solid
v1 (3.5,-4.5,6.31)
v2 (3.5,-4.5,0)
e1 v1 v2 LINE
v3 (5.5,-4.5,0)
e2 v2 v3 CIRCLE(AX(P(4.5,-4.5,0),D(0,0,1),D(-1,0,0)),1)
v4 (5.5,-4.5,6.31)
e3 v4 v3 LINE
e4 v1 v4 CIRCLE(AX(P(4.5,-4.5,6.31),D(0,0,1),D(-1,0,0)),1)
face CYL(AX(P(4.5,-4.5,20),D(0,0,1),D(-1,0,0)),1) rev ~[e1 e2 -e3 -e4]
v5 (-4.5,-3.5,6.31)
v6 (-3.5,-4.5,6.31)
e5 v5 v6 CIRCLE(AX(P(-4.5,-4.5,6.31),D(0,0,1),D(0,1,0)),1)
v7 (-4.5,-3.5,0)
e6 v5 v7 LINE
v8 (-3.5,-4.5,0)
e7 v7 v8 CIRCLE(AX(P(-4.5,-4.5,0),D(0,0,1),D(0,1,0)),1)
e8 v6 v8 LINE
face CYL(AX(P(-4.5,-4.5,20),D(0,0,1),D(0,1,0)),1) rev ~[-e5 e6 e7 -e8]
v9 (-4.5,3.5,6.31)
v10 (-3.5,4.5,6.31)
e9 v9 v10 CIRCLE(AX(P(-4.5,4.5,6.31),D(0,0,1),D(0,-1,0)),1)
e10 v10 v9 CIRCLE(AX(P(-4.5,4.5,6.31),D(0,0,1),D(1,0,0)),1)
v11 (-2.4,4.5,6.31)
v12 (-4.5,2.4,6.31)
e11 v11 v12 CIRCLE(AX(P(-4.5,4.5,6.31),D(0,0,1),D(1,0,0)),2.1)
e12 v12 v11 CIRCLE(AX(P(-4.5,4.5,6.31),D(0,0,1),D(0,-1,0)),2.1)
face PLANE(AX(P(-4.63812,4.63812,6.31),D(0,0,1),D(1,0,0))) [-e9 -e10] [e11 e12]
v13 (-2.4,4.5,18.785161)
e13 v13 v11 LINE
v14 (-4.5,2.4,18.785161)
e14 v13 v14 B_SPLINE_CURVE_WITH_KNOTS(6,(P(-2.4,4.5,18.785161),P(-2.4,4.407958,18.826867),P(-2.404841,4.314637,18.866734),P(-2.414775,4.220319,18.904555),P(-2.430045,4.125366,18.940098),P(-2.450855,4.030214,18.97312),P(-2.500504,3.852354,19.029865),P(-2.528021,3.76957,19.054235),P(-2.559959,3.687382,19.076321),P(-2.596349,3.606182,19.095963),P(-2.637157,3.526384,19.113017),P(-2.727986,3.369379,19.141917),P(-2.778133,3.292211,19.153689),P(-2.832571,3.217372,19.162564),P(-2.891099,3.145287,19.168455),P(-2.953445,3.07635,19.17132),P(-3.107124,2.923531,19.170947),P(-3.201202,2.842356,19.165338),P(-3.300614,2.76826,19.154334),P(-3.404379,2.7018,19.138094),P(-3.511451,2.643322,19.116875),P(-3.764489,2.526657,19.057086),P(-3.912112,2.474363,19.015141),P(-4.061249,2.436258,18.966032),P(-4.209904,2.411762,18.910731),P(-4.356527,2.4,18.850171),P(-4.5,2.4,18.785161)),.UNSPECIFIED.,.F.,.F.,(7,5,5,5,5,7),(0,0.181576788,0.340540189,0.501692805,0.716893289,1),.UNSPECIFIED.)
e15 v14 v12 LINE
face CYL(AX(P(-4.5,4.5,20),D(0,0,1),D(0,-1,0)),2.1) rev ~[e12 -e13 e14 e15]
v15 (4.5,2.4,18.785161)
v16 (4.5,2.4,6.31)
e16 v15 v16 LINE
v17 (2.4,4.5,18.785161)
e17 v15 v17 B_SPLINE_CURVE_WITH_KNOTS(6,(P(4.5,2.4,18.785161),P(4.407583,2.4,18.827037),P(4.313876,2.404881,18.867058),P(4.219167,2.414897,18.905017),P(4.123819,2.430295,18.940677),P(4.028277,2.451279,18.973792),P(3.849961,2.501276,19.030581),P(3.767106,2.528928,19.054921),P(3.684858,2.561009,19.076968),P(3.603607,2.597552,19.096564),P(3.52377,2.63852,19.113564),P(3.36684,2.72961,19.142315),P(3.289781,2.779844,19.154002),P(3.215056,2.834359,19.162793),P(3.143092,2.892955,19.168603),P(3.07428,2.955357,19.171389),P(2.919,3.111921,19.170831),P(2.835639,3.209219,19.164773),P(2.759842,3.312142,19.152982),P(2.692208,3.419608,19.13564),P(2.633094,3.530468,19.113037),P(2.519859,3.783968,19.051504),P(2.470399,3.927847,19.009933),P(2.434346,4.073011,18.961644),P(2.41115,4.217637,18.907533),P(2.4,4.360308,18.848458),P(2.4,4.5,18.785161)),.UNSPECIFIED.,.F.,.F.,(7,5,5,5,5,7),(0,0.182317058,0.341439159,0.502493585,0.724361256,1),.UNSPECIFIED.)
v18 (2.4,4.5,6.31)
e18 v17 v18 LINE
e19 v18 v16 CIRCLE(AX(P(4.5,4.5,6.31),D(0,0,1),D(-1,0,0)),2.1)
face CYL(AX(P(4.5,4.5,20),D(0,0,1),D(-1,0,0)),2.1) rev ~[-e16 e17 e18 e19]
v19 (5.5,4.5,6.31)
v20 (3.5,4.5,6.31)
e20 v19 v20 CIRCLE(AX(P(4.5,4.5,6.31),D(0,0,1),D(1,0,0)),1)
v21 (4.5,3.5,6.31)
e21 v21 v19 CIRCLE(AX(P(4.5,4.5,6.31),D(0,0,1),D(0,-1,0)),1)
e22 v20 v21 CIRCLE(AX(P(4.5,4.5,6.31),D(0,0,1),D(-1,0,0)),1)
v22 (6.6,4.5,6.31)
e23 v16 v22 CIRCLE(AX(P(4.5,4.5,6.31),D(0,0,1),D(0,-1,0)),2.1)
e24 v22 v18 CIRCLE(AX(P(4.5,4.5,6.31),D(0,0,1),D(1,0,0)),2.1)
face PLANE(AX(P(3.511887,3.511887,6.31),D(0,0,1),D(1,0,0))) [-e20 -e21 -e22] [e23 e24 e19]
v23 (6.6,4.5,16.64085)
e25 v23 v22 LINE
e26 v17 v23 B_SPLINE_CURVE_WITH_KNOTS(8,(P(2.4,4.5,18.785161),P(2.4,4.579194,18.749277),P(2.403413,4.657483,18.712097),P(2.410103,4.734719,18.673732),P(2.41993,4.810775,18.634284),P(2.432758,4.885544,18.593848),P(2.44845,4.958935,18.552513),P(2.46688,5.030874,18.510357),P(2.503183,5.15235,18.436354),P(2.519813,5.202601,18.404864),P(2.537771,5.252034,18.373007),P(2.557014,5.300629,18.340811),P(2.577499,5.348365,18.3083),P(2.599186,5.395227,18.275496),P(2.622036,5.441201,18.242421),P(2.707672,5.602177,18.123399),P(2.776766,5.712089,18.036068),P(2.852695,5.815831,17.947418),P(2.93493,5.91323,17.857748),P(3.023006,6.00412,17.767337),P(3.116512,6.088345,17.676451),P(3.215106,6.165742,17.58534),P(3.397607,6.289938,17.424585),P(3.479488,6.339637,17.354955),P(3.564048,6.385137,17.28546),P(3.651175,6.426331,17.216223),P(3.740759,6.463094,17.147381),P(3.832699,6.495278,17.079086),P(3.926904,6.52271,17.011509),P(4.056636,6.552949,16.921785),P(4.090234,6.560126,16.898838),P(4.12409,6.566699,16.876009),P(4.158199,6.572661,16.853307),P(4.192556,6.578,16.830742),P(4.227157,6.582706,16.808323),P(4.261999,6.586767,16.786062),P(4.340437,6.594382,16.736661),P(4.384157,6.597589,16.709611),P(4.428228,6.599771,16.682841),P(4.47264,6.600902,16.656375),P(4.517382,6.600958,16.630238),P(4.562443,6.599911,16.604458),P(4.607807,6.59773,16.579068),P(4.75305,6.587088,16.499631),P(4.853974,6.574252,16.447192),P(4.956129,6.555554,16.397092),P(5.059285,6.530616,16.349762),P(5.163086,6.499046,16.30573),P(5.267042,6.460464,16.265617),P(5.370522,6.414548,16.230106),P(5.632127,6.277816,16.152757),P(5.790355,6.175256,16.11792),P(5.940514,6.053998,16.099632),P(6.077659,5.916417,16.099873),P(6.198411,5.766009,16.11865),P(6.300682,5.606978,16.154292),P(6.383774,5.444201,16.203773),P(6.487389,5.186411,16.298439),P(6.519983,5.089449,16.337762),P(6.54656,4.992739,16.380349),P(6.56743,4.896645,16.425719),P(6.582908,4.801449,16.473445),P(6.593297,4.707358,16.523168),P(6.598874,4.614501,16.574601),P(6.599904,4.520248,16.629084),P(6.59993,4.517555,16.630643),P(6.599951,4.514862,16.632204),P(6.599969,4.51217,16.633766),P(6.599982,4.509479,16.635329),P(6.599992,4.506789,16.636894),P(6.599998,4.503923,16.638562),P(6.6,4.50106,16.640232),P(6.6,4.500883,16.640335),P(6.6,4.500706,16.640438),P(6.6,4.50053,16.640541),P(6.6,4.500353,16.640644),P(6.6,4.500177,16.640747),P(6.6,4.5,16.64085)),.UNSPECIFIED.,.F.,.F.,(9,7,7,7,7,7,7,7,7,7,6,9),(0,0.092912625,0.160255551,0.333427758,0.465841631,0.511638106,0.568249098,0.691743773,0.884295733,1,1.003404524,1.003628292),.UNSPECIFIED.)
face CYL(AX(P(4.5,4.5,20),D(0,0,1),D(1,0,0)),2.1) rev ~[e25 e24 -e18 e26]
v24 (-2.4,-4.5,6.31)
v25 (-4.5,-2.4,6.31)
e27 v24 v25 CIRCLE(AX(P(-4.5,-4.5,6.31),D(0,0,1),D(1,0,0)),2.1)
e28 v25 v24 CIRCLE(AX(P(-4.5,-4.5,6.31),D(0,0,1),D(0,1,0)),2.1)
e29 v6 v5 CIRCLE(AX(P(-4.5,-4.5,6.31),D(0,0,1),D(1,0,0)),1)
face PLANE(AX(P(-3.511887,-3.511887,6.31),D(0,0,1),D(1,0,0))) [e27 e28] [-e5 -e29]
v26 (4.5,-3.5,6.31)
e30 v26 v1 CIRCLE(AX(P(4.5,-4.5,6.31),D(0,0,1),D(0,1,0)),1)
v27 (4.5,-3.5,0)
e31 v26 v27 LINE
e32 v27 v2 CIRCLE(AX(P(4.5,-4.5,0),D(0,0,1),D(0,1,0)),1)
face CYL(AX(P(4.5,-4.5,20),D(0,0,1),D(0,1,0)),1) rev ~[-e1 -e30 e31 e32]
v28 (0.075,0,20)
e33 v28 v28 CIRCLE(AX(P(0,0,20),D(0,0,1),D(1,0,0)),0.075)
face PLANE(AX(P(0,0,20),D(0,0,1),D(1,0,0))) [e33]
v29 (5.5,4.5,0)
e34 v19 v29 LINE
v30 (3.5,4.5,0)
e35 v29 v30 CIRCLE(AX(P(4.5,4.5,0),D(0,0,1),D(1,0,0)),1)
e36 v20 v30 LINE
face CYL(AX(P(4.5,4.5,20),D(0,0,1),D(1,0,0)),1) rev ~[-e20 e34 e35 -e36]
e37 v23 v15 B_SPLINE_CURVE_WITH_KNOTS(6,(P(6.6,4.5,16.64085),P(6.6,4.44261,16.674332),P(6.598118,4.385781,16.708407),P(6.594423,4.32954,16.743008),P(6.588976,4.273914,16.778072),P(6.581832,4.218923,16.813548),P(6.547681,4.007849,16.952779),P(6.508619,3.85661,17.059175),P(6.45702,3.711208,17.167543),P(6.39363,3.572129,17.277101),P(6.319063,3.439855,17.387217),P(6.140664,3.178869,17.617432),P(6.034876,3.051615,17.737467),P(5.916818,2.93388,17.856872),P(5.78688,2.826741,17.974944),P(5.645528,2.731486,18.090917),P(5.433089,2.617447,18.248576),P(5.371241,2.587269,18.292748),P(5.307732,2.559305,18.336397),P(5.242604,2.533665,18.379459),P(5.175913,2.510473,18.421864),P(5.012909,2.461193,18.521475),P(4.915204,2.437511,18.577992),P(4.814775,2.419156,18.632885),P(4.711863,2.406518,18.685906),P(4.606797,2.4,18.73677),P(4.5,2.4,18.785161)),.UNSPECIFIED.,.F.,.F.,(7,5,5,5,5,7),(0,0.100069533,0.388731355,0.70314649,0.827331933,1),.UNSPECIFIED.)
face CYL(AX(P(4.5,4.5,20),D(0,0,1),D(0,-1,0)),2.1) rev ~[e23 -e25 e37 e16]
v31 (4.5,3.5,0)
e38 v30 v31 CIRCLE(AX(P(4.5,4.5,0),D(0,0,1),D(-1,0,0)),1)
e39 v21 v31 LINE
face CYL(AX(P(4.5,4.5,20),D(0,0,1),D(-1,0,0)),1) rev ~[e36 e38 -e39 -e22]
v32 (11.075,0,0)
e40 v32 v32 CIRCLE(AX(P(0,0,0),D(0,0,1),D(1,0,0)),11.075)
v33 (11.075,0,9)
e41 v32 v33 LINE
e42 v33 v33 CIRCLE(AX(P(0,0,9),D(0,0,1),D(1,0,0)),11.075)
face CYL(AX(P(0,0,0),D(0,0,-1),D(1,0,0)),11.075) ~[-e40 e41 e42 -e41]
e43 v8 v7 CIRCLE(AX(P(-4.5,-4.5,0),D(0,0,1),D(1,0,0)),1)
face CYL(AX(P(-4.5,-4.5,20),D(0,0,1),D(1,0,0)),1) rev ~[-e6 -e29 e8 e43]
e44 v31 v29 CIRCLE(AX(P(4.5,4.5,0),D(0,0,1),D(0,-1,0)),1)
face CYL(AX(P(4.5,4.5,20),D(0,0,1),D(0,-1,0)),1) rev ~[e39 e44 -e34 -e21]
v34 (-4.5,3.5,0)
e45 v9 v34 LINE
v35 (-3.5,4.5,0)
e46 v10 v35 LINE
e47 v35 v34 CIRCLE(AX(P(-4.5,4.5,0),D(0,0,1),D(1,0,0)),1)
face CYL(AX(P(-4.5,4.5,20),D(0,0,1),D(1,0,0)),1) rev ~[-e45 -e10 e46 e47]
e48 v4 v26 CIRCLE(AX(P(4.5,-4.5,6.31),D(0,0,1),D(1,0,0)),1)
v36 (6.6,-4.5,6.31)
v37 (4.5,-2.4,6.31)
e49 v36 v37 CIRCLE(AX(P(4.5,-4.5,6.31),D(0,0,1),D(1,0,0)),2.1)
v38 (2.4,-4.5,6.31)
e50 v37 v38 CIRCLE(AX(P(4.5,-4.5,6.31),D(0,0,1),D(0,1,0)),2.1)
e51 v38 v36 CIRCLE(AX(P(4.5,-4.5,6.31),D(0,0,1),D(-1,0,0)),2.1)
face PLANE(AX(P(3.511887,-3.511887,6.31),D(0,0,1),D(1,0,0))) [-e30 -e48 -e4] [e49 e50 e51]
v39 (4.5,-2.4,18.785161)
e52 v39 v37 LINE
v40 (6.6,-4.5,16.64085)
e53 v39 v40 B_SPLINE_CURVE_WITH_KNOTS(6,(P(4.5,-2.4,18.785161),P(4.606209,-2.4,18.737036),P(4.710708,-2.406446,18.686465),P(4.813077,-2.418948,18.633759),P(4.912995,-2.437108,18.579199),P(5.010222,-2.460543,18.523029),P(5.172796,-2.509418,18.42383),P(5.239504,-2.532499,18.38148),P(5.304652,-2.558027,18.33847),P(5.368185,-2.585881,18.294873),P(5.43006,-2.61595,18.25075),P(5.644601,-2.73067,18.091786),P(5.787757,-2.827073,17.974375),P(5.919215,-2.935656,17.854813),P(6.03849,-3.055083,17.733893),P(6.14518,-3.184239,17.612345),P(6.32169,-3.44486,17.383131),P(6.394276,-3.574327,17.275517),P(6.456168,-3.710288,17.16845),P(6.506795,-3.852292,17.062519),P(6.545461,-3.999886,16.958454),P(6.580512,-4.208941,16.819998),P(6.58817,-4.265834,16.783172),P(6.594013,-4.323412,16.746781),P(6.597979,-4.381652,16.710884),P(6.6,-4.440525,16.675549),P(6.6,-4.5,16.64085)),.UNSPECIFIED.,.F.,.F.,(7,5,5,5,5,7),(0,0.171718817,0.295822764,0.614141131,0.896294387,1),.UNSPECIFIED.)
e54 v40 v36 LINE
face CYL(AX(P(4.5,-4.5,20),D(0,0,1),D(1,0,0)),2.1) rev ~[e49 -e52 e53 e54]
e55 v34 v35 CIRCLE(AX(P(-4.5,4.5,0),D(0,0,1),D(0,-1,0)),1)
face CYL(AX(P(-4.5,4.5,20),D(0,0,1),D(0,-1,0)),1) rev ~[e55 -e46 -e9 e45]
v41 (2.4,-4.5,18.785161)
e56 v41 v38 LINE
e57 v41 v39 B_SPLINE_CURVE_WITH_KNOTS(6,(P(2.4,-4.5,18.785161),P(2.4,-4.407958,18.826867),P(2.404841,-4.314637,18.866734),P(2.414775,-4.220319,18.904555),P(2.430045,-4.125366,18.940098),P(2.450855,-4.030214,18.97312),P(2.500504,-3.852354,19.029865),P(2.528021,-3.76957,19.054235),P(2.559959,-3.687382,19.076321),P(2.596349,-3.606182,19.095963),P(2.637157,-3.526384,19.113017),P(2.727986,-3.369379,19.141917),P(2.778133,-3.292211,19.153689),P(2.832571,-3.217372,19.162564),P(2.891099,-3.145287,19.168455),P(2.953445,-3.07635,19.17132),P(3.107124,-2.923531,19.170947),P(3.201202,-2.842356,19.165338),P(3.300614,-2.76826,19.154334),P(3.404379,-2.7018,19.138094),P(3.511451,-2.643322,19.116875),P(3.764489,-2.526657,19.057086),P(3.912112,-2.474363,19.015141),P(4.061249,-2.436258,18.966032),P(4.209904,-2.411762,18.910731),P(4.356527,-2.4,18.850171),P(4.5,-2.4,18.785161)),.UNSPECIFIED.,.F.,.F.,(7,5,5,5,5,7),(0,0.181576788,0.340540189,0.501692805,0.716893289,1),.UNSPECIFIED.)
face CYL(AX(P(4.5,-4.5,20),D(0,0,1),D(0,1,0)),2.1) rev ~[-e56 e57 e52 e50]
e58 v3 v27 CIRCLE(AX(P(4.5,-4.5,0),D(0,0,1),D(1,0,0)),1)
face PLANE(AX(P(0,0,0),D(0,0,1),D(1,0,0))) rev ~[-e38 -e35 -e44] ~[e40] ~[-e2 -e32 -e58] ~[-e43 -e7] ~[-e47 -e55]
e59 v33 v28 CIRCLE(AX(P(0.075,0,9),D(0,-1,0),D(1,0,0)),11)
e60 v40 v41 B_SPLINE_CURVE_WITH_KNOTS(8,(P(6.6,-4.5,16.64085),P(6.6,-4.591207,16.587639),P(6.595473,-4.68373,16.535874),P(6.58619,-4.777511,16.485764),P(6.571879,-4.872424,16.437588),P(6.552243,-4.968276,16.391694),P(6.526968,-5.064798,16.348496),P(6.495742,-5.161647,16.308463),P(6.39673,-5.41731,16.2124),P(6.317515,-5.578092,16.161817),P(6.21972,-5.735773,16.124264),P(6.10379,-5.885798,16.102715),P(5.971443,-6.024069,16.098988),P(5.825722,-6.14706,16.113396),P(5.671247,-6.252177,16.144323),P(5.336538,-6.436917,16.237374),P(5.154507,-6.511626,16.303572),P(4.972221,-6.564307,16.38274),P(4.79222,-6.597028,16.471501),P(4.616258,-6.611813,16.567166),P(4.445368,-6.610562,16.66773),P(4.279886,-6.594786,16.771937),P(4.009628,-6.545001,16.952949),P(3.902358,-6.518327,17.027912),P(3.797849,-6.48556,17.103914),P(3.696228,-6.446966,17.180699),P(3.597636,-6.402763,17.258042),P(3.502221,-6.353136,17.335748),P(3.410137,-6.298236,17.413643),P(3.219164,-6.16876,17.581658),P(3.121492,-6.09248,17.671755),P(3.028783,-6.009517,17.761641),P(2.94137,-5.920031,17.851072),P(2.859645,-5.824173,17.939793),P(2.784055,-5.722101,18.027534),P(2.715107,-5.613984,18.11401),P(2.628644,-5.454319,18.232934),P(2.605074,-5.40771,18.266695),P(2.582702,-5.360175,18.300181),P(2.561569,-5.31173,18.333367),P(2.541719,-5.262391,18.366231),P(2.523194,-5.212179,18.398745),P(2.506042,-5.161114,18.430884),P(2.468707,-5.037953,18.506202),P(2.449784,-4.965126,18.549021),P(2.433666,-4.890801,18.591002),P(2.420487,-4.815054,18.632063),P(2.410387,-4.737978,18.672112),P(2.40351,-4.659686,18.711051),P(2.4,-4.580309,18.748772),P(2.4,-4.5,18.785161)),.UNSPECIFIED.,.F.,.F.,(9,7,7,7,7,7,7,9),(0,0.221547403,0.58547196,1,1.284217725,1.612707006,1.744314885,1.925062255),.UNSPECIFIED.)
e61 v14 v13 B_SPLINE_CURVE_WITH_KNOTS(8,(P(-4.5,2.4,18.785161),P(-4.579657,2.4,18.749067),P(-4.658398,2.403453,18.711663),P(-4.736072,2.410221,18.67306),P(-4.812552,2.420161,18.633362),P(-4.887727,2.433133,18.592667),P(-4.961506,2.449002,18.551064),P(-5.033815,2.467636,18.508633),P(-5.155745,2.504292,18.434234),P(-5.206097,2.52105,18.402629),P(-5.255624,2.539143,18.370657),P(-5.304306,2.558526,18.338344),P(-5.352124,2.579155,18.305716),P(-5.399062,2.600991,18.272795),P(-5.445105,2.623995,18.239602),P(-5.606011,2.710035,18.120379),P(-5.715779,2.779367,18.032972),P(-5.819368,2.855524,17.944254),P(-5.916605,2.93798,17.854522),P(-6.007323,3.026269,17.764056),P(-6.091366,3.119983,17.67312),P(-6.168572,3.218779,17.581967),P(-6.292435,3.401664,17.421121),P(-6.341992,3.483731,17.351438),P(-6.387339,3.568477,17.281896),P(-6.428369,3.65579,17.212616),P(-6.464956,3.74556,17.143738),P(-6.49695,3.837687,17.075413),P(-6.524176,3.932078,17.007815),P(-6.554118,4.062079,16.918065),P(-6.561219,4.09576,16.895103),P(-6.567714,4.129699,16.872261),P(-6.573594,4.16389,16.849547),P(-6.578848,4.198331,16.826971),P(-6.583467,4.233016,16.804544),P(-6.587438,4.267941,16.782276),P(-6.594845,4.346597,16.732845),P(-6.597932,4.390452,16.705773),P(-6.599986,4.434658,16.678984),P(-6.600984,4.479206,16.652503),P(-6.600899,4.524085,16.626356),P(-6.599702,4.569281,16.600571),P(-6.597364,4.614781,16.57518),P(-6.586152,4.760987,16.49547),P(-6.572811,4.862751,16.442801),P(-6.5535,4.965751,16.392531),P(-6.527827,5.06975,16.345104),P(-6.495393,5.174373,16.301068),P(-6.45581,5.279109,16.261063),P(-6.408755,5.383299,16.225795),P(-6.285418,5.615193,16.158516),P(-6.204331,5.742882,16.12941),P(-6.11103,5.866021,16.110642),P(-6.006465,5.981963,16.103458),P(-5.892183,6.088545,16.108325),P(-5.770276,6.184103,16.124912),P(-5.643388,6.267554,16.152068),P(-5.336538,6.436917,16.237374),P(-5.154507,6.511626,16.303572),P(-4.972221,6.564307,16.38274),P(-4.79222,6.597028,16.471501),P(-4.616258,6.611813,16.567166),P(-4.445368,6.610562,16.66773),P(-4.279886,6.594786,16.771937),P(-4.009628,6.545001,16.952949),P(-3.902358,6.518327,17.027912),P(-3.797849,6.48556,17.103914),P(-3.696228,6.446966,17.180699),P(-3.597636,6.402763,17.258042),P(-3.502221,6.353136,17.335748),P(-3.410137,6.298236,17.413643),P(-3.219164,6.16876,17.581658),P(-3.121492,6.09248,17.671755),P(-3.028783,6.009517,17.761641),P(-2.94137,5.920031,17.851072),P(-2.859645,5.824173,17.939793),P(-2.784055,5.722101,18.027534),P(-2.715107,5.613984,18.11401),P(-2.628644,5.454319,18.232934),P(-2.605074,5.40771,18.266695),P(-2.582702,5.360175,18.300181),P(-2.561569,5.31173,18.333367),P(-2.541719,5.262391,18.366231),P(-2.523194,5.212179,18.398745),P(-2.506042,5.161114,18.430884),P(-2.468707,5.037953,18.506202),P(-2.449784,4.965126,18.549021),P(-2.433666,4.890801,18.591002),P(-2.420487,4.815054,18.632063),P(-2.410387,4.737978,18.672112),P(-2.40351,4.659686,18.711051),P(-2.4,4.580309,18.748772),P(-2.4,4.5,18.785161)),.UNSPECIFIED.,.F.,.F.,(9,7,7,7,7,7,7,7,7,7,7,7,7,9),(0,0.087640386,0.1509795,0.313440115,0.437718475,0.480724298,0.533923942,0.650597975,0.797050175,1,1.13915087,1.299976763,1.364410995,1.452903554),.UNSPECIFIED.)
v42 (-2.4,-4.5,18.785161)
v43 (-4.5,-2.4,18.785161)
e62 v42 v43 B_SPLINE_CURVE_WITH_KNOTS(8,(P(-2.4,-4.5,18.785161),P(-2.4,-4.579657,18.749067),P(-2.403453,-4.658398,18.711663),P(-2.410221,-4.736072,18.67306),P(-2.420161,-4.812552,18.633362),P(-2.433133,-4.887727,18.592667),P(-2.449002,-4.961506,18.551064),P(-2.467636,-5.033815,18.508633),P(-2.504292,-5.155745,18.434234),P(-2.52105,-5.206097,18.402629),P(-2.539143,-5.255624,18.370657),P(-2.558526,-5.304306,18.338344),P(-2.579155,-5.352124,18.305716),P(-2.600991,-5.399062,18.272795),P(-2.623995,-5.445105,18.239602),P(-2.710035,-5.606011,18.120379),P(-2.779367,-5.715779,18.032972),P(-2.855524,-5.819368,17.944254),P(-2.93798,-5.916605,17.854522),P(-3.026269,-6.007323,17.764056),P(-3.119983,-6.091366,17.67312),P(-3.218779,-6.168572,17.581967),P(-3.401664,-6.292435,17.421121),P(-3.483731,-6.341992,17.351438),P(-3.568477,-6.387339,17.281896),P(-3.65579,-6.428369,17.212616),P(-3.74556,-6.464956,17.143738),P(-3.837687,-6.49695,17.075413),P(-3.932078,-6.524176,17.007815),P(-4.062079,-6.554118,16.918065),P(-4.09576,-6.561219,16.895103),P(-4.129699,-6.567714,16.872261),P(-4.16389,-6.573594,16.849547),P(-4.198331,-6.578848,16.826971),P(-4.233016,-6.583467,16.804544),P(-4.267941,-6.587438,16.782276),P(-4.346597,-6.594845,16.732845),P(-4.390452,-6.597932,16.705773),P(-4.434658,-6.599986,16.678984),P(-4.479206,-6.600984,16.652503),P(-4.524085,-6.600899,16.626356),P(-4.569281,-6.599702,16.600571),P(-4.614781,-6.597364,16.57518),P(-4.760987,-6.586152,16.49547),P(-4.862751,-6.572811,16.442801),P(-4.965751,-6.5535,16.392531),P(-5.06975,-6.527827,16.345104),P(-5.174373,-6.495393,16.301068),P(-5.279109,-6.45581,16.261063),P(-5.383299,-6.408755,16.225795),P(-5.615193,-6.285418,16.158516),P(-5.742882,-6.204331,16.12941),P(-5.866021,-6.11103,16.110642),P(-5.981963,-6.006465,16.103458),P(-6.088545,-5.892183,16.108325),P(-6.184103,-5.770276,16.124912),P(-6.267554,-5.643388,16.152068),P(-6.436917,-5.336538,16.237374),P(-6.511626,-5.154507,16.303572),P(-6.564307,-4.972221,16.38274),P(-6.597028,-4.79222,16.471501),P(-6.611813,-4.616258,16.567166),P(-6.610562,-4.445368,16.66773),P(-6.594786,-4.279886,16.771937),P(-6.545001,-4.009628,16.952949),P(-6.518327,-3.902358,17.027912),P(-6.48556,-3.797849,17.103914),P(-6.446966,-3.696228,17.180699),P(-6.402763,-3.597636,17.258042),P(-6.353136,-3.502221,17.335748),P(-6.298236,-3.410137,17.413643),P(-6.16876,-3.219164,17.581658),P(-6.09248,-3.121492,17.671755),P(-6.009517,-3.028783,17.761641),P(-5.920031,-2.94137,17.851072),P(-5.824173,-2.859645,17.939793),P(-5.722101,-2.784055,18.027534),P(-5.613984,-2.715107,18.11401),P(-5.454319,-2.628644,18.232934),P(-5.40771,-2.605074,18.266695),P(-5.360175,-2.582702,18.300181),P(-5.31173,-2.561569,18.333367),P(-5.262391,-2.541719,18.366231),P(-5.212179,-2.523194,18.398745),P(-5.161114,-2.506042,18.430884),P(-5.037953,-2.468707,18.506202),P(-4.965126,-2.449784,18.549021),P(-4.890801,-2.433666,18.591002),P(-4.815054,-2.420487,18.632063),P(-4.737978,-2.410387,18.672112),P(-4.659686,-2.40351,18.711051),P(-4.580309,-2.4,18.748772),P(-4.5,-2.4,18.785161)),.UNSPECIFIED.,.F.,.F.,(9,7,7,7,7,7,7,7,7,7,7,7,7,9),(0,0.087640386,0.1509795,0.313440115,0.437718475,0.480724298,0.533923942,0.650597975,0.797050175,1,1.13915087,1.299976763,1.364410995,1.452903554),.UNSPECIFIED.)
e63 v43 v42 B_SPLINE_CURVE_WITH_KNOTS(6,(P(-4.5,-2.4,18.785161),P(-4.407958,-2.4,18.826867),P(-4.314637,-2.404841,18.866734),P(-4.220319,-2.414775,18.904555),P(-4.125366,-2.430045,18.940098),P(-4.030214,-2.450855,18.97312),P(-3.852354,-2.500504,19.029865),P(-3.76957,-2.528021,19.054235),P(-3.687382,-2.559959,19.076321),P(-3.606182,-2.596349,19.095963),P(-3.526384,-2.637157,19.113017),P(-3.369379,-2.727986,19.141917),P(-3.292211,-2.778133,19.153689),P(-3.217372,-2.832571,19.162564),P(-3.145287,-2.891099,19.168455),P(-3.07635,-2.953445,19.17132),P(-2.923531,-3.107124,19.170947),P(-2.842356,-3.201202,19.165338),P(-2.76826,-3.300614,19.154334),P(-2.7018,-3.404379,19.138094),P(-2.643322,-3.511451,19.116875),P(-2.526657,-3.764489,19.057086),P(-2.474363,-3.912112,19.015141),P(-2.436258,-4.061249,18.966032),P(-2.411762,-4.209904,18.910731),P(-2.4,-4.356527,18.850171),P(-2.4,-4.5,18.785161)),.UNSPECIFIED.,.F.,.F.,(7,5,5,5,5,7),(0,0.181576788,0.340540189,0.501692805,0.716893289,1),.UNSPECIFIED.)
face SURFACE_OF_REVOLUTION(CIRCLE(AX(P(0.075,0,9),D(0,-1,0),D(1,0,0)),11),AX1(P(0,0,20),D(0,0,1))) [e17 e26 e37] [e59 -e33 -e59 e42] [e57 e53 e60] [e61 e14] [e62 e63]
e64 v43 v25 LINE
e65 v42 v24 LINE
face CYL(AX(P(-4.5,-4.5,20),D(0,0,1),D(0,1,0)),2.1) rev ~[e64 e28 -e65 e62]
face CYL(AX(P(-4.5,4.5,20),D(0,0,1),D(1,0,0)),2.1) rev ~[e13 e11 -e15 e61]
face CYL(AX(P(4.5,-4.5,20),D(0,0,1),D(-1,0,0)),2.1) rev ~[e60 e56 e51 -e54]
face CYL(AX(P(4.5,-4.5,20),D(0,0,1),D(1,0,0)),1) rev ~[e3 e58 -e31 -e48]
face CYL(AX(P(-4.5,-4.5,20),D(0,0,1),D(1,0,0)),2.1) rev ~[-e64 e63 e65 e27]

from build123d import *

# Parameters (mm, degrees)
F0_R     = 11.075
F1_DEPTH = 20
F3_DEPTH = 20.001
F5_DEPTH = 13.69


# Not quite as in the source:
# - a fillet or chamfer that OpenCascade refuses, or shapes differently, is made with other operations: its cross-section is extruded or revolved along the edge and cut away or added


with BuildPart() as f1:
    # F0 (on Top) → F1 (new body)
    with BuildSketch(Plane.XY):
        Circle(F0_R)
    extrude(amount=F1_DEPTH)

    # F2 (on face) → F3 (cut, through all)
    with BuildSketch(Plane.XY.offset(20)):
        with BuildLine():
            Line((4.5, 4.5), (3.5, 4.5))
            ThreePointArc((3.5, 4.5), (3.7928932188, 3.7928932188), (4.5, 3.5))
            Line((4.5, 3.5), (4.5, 4.5))
        make_face()
        with BuildLine():
            Line((-4.5, 4.5), (-3.5, 4.5))
            ThreePointArc((-3.5, 4.5), (-5.2071067812, 5.2071067812), (-4.5, 3.5))
            Line((-4.5, 3.5), (-4.5, 4.5))
        make_face()
        with BuildLine():
            ThreePointArc((-4.5, 3.5), (-3.7928932188, 3.7928932188), (-3.5, 4.5))
            Line((-3.5, 4.5), (-4.5, 4.5))
            Line((-4.5, 4.5), (-4.5, 3.5))
        make_face()
        with BuildLine():
            Line((4.5, -4.5), (4.5, -3.5))
            ThreePointArc((4.5, -3.5), (3.7928932188, -3.7928932188), (3.5, -4.5))
            Line((3.5, -4.5), (4.5, -4.5))
        make_face()
        with BuildLine():
            ThreePointArc((5.5, -4.5), (5.2071067812, -3.7928932188), (4.5, -3.5))
            Line((4.5, -3.5), (4.5, -4.5))
            Line((4.5, -4.5), (3.5, -4.5))
            ThreePointArc((3.5, -4.5), (4.5, -5.5), (5.5, -4.5))
        make_face()
        with BuildLine():
            ThreePointArc((-3.5, -4.5), (-3.7928932188, -3.7928932188), (-4.5, -3.5))
            Line((-4.5, -3.5), (-4.5, -4.5))
            Line((-4.5, -4.5), (-3.5, -4.5))
        make_face()
        with BuildLine():
            Line((-4.5, -4.5), (-4.5, -3.5))
            ThreePointArc((-4.5, -3.5), (-5.2071067812, -5.2071067812), (-3.5, -4.5))
            Line((-3.5, -4.5), (-4.5, -4.5))
        make_face()
        with BuildLine():
            ThreePointArc((5.5, 4.5), (4.5, 5.5), (3.5, 4.5))
            Line((3.5, 4.5), (4.5, 4.5))
            Line((4.5, 4.5), (4.5, 3.5))
            ThreePointArc((4.5, 3.5), (5.2071067812, 3.7928932188), (5.5, 4.5))
        make_face()
    extrude(amount=-F3_DEPTH, mode=Mode.SUBTRACT)

    # F4 (on face) → F5 (cut)
    with BuildSketch(Plane.XY.offset(20)):
        with BuildLine():
            ThreePointArc((-4.5, -3.5), (-3.7928932188, -3.7928932188), (-3.5, -4.5))
            Line((-3.5, -4.5), (-2.4, -4.5))
            ThreePointArc((-2.4, -4.5), (-3.0150757595, -3.0150757595), (-4.5, -2.4))
            Line((-4.5, -2.4), (-4.5, -3.5))
        make_face()
        with BuildLine():
            Line((-2.4, -4.5), (-3.5, -4.5))
            ThreePointArc((-3.5, -4.5), (-5.2071067812, -5.2071067812), (-4.5, -3.5))
            Line((-4.5, -3.5), (-4.5, -2.4))
            ThreePointArc((-4.5, -2.4), (-5.9849242405, -5.9849242405), (-2.4, -4.5))
        make_face()
        with BuildLine():
            ThreePointArc((4.5, -2.4), (3.0150757595, -3.0150757595), (2.4, -4.5))
            Line((2.4, -4.5), (3.5, -4.5))
            ThreePointArc((3.5, -4.5), (3.7928932188, -3.7928932188), (4.5, -3.5))
            Line((4.5, -3.5), (4.5, -2.4))
        make_face()
        with BuildLine():
            Line((3.5, -4.5), (2.4, -4.5))
            ThreePointArc((2.4, -4.5), (4.5, -6.6), (6.6, -4.5))
            ThreePointArc((6.6, -4.5), (5.9849242405, -3.0150757595), (4.5, -2.4))
            Line((4.5, -2.4), (4.5, -3.5))
            ThreePointArc((4.5, -3.5), (5.2071067812, -3.7928932188), (5.5, -4.5))
            ThreePointArc((5.5, -4.5), (4.5, -5.5), (3.5, -4.5))
        make_face()
        with BuildLine():
            ThreePointArc((-2.4, 4.5), (-5.9849242405, 5.9849242405), (-4.5, 2.4))
            Line((-4.5, 2.4), (-4.5, 3.5))
            ThreePointArc((-4.5, 3.5), (-5.2071067812, 5.2071067812), (-3.5, 4.5))
            Line((-3.5, 4.5), (-2.4, 4.5))
        make_face()
        with BuildLine():
            Line((-4.5, 3.5), (-4.5, 2.4))
            ThreePointArc((-4.5, 2.4), (-3.0150757595, 3.0150757595), (-2.4, 4.5))
            Line((-2.4, 4.5), (-3.5, 4.5))
            ThreePointArc((-3.5, 4.5), (-3.7928932188, 3.7928932188), (-4.5, 3.5))
        make_face()
        with BuildLine():
            ThreePointArc((2.4, 4.5), (3.0150757595, 3.0150757595), (4.5, 2.4))
            Line((4.5, 2.4), (4.5, 3.5))
            ThreePointArc((4.5, 3.5), (3.7928932188, 3.7928932188), (3.5, 4.5))
            Line((3.5, 4.5), (2.4, 4.5))
        make_face()
        with BuildLine():
            Line((4.5, 3.5), (4.5, 2.4))
            ThreePointArc((4.5, 2.4), (5.9849242405, 3.0150757595), (6.6, 4.5))
            ThreePointArc((6.6, 4.5), (4.5, 6.6), (2.4, 4.5))
            Line((2.4, 4.5), (3.5, 4.5))
            ThreePointArc((3.5, 4.5), (4.5, 5.5), (5.5, 4.5))
            ThreePointArc((5.5, 4.5), (5.2071067812, 3.7928932188), (4.5, 3.5))
        make_face()
        with BuildLine():
            Line((-4.5, -3.5), (-4.5, -4.5))
            Line((-4.5, -4.5), (-3.5, -4.5))
            ThreePointArc((-3.5, -4.5), (-3.7928932188, -3.7928932188), (-4.5, -3.5))
        make_face()
        with BuildLine():
            Line((-3.5, -4.5), (-4.5, -4.5))
            Line((-4.5, -4.5), (-4.5, -3.5))
            ThreePointArc((-4.5, -3.5), (-5.2071067812, -5.2071067812), (-3.5, -4.5))
        make_face()
        with BuildLine():
            ThreePointArc((4.5, -3.5), (3.7928932188, -3.7928932188), (3.5, -4.5))
            Line((3.5, -4.5), (4.5, -4.5))
            Line((4.5, -4.5), (4.5, -3.5))
        make_face()
        with BuildLine():
            Line((4.5, -4.5), (3.5, -4.5))
            ThreePointArc((3.5, -4.5), (4.5, -5.5), (5.5, -4.5))
            ThreePointArc((5.5, -4.5), (5.2071067812, -3.7928932188), (4.5, -3.5))
            Line((4.5, -3.5), (4.5, -4.5))
        make_face()
        with BuildLine():
            ThreePointArc((-3.5, 4.5), (-5.2071067812, 5.2071067812), (-4.5, 3.5))
            Line((-4.5, 3.5), (-4.5, 4.5))
            Line((-4.5, 4.5), (-3.5, 4.5))
        make_face()
        with BuildLine():
            Line((-4.5, 4.5), (-4.5, 3.5))
            ThreePointArc((-4.5, 3.5), (-3.7928932188, 3.7928932188), (-3.5, 4.5))
            Line((-3.5, 4.5), (-4.5, 4.5))
        make_face()
        with BuildLine():
            ThreePointArc((3.5, 4.5), (3.7928932188, 3.7928932188), (4.5, 3.5))
            Line((4.5, 3.5), (4.5, 4.5))
            Line((4.5, 4.5), (3.5, 4.5))
        make_face()
        with BuildLine():
            Line((4.5, 4.5), (4.5, 3.5))
            ThreePointArc((4.5, 3.5), (5.2071067812, 3.7928932188), (5.5, 4.5))
            ThreePointArc((5.5, 4.5), (4.5, 5.5), (3.5, 4.5))
            Line((3.5, 4.5), (4.5, 4.5))
        make_face()
    extrude(amount=-F5_DEPTH, mode=Mode.SUBTRACT)

    # F6: fillet of radius 11 on 1 edges, made by hand

    # F6_s1 → F6_t2 (revolve, cut)
    with BuildSketch(Plane.XZ):
        with BuildLine():
            ThreePointArc((11.075, 9), (7.8531745931, 16.7781745931), (0.075, 20))
            Line((0.075, 20), (11.075, 20))
            Line((11.075, 20), (11.075, 9))
        make_face()
    revolve(axis=Axis((0, 0, 20), (0, 0, 1)), mode=Mode.SUBTRACT)


solid = f1.part
